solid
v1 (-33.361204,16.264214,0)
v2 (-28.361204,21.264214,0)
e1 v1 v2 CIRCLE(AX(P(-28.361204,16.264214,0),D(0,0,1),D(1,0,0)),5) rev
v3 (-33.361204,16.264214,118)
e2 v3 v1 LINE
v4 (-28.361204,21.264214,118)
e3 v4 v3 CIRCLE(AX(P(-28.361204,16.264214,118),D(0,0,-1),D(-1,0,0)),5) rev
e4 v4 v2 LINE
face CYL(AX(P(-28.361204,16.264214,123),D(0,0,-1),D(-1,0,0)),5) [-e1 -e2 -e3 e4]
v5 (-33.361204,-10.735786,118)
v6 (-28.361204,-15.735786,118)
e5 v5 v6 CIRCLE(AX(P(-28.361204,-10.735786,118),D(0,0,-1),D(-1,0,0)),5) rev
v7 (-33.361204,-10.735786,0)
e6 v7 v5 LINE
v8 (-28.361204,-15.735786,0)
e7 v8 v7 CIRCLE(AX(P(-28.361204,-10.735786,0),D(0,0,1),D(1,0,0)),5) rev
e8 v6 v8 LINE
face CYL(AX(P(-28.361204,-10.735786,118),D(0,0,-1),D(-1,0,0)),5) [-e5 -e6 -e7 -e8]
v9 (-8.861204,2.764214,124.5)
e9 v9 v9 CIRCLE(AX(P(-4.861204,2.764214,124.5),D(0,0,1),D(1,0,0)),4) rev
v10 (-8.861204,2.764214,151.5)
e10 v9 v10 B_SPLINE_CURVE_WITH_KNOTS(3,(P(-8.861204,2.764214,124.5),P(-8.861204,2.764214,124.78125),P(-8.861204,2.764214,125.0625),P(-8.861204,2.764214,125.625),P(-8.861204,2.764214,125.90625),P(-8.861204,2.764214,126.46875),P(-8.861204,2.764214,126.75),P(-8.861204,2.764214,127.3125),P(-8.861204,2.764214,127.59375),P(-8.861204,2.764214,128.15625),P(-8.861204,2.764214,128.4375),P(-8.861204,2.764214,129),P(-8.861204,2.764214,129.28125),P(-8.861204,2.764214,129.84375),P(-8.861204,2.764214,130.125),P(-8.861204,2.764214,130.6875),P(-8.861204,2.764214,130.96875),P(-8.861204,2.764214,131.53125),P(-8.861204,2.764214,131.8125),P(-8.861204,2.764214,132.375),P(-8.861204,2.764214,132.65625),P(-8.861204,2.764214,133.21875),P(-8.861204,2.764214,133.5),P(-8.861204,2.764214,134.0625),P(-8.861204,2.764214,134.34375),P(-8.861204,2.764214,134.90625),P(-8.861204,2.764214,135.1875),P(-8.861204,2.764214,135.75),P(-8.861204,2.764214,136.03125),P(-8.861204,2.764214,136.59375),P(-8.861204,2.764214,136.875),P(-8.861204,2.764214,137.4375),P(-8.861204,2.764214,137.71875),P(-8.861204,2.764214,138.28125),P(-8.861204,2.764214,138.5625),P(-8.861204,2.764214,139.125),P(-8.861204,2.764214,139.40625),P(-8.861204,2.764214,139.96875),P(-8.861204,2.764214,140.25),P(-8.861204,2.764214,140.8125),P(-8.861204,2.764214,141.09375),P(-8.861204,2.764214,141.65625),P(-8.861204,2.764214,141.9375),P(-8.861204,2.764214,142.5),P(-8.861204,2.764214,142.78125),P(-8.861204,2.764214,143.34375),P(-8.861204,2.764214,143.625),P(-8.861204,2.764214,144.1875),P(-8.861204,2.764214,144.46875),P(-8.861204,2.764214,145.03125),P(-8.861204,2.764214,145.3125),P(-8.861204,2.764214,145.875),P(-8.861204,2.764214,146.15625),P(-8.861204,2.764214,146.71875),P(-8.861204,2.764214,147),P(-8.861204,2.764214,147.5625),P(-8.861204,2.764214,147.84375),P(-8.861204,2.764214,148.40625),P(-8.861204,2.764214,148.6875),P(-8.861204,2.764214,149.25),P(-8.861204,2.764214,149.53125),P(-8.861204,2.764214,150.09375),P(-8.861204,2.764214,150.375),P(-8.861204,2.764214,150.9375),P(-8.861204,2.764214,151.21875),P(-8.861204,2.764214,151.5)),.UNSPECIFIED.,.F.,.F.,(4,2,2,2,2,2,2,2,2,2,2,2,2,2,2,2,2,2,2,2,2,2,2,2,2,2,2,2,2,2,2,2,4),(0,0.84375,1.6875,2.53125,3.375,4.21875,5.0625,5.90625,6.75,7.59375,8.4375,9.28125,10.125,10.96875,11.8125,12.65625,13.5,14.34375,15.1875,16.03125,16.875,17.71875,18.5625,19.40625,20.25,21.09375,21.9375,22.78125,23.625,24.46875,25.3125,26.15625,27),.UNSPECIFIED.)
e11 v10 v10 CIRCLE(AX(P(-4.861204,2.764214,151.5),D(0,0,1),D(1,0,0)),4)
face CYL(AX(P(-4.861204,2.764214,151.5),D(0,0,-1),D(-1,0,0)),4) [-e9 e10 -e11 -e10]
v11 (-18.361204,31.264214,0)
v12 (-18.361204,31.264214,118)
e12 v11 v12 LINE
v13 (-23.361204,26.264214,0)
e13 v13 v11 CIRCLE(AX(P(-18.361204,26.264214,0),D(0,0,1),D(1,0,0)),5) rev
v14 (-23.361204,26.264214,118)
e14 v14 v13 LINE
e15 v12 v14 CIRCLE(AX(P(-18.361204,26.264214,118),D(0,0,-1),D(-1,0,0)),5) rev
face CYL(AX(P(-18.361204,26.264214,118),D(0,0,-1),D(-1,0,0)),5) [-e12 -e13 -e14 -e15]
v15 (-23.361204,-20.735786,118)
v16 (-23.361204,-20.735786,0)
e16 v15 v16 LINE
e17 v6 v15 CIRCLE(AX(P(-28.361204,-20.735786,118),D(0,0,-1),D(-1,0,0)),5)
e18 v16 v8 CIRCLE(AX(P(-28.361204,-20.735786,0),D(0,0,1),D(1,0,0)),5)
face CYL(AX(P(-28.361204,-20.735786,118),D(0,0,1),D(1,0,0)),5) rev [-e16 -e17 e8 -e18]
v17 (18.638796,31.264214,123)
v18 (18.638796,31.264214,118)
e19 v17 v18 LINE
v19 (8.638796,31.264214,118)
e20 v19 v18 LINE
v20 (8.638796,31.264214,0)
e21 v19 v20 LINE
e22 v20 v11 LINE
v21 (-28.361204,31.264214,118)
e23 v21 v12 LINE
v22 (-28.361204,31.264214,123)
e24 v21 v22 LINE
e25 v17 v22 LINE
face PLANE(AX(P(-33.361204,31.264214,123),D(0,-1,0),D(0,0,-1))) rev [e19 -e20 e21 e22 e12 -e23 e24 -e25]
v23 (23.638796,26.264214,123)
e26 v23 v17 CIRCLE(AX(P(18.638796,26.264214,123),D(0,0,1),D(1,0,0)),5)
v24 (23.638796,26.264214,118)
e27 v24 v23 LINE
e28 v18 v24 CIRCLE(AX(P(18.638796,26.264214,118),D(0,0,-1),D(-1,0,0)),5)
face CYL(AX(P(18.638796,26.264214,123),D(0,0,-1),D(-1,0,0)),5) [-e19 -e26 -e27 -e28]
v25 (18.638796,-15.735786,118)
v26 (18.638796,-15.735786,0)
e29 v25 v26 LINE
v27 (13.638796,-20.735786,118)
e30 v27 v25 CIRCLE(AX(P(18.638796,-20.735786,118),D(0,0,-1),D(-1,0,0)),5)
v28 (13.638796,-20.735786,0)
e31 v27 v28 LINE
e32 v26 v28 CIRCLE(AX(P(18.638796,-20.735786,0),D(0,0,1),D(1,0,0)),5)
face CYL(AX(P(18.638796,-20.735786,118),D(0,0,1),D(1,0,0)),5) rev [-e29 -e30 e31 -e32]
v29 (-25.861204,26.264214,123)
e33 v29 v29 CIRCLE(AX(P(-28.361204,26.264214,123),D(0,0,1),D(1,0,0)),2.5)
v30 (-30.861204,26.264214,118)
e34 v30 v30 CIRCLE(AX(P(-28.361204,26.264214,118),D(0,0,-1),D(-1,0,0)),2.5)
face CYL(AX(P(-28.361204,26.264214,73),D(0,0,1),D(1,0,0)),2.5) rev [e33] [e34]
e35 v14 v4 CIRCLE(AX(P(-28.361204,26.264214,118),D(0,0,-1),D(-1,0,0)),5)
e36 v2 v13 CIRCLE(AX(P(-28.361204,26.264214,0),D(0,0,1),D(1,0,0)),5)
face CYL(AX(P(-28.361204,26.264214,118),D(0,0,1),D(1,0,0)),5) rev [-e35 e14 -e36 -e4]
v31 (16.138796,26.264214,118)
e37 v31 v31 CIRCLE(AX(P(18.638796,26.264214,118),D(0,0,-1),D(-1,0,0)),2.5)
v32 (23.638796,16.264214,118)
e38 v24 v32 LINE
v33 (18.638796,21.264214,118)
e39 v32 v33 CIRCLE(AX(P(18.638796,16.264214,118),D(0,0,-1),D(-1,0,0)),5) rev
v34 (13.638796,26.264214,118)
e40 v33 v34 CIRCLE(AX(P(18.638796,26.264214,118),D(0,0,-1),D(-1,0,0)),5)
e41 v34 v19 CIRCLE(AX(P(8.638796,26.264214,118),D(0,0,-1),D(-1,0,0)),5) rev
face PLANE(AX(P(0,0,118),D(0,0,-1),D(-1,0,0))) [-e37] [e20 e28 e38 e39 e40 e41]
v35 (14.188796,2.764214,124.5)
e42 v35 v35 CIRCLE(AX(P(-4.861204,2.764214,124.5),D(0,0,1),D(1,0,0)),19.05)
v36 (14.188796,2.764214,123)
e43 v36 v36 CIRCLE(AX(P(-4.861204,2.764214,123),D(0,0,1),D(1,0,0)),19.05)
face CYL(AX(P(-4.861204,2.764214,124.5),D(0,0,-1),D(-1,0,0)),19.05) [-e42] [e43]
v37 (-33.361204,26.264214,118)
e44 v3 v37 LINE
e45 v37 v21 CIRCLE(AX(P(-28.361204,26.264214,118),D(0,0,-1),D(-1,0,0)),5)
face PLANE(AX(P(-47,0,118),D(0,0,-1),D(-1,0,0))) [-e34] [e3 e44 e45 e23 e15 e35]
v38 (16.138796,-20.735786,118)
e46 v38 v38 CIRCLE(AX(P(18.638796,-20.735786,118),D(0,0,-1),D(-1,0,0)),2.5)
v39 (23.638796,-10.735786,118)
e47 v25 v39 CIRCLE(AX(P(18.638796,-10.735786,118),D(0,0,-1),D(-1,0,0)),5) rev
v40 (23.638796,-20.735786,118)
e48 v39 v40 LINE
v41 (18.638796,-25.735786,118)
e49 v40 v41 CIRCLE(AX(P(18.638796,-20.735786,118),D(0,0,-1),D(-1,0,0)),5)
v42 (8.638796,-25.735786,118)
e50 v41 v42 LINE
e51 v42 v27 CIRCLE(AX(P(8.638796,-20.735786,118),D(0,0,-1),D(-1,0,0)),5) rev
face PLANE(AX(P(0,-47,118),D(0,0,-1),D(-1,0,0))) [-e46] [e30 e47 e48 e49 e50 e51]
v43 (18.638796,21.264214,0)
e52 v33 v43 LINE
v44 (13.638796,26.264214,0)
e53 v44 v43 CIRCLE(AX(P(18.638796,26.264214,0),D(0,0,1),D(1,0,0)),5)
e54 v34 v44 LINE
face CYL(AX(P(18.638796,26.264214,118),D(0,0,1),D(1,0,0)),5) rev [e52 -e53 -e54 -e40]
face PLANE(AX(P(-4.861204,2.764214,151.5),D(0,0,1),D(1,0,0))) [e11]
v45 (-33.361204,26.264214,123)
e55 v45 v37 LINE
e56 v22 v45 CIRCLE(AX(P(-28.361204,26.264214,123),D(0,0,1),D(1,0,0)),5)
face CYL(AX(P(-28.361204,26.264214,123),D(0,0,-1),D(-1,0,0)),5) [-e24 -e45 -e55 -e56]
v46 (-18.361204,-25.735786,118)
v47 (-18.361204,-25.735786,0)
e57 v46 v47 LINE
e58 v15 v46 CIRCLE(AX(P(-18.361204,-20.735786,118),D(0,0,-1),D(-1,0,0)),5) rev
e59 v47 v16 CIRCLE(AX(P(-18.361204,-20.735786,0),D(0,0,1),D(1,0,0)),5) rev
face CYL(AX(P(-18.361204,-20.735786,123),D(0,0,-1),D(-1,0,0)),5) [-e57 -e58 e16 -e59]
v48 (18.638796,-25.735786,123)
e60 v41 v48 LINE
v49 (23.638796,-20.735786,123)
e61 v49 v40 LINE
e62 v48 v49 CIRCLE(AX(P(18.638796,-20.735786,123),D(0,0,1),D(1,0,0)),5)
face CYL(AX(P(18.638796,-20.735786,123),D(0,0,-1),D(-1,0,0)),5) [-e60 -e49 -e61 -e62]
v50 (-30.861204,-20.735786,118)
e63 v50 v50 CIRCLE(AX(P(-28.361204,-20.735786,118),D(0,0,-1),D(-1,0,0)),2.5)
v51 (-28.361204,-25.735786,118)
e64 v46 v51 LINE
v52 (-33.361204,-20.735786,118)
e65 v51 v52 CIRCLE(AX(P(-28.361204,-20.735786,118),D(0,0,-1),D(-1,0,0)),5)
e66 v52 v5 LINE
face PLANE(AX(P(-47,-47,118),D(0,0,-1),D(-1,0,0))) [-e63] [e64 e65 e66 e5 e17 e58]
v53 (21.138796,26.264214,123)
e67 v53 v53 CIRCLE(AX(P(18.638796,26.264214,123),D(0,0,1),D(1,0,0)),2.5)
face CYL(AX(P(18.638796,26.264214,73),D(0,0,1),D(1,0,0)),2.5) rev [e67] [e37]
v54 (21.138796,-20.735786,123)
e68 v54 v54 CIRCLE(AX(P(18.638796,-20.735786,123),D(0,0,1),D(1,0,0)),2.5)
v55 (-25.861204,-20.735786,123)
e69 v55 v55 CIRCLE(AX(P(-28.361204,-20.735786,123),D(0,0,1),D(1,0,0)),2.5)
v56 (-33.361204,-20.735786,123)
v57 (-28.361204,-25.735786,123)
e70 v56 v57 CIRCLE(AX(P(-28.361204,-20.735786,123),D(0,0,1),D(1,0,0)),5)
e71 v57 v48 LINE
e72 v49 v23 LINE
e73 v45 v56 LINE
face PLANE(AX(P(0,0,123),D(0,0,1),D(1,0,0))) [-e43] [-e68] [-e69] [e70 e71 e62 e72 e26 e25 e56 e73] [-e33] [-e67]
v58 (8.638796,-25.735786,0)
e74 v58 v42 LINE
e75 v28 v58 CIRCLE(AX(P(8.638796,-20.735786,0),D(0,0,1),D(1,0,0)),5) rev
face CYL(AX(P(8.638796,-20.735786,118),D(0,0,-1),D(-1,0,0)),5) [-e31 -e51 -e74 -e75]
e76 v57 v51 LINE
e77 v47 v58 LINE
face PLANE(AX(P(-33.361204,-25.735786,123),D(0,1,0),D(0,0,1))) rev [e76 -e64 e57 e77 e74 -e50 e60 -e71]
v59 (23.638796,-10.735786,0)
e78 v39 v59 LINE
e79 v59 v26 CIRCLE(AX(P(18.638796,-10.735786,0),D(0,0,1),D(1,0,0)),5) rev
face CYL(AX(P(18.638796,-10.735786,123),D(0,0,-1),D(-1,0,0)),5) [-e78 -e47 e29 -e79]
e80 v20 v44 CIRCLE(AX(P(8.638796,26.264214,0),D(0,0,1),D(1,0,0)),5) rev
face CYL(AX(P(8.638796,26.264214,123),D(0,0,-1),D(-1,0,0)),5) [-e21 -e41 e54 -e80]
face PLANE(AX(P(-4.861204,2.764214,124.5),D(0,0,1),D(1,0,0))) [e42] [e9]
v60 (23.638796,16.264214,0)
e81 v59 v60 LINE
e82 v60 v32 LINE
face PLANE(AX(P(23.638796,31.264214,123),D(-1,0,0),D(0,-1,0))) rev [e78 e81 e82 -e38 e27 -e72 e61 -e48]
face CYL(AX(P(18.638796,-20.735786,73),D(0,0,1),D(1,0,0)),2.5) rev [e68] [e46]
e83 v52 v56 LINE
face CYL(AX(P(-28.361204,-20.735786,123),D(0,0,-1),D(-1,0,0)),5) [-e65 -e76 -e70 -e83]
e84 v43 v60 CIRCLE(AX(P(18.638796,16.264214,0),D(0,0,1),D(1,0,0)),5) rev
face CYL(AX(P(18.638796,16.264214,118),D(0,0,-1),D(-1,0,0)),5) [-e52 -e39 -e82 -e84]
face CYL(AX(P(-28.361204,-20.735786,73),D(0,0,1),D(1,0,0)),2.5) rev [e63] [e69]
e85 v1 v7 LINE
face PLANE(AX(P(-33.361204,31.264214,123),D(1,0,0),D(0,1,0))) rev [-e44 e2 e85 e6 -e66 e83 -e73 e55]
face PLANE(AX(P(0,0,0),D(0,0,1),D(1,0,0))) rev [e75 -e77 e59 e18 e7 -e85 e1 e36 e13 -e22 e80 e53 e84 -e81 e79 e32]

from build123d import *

# Parameters (mm, degrees)
SKETCH1_W            = 57
SKETCH1_H            = 57
BOSS_EXTRUDE1_DEPTH  = 123
SKETCH2_W            = 10
SKETCH2_H            = 10
CUT_EXTRUDE1_DEPTH   = 118
LPATTERN1_COUNT      = 2
LPATTERN1_PITCH      = 47
LPATTERN1_COUNT_DIR2 = 2
LPATTERN1_PITCH_DIR2 = 47
SKETCH3_R            = 2.5
CUT_EXTRUDE2_DEPTH   = 50
LPATTERN2_COUNT      = 2
LPATTERN2_PITCH      = 47
LPATTERN2_COUNT_DIR2 = 2
LPATTERN2_PITCH_DIR2 = 47
FILLET1_R            = 5
SKETCH5_R            = 19.05
BOSS_EXTRUDE3_DEPTH  = 1.5
SKETCH4_R            = 4
BOSS_EXTRUDE2_DEPTH  = 28.5


with BuildPart() as part:
    # Sketch1 → Boss-Extrude1 (new body)
    with BuildSketch(Plane.XY):
        with Locations((-4.861204013, 2.764214047)):
            Rectangle(SKETCH1_W, SKETCH1_H)
    extrude(amount=BOSS_EXTRUDE1_DEPTH)

    # Sketch2 → Cut-Extrude1 (cut)
    with BuildSketch(Plane(origin=(0, 0, 0), x_dir=(-1, 0, 0), z_dir=(0, 0, -1))):
        with Locations((-18.638795987, 26.264214047)):
            Rectangle(SKETCH2_W, SKETCH2_H)
    cut_extrude1 = extrude(amount=-CUT_EXTRUDE1_DEPTH, mode=Mode.SUBTRACT)

    # LPattern1: Cut-Extrude1 2 × 2
    with Locations(*[(-i * LPATTERN1_PITCH, -j * LPATTERN1_PITCH_DIR2, 0) for i in range(LPATTERN1_COUNT) for j in range(LPATTERN1_COUNT_DIR2) if (i, j) != (0, 0)]):
        add(cut_extrude1, mode=Mode.SUBTRACT)

    # Sketch3 → Cut-Extrude2 (cut)
    with BuildSketch(Plane.XY.offset(123)):
        with Locations((-28.361204013, 26.264214047)):
            Circle(SKETCH3_R)
    cut_extrude2 = extrude(amount=-CUT_EXTRUDE2_DEPTH, mode=Mode.SUBTRACT)

    # LPattern2: Cut-Extrude2 2 × 2
    with Locations(*[(i * LPATTERN2_PITCH, -j * LPATTERN2_PITCH_DIR2, 0) for i in range(LPATTERN2_COUNT) for j in range(LPATTERN2_COUNT_DIR2) if (i, j) != (0, 0)]):
        add(cut_extrude2, mode=Mode.SUBTRACT)

    # Fillet1
    fillet1_edges = [part.edges().sort_by_distance(p)[0] for p in [
        (-33.361204013, 21.264214047, 59),
        (-23.361204013, 21.264214047, 59),
        (-23.361204013, 31.264214047, 59),
        (13.638795987, 31.264214047, 59),
        (13.638795987, 21.264214047, 59),
        (23.638795987, 21.264214047, 59),
        (23.638795987, -25.735785953, 120.5),
        (23.638795987, -15.735785953, 59),
        (13.638795987, -15.735785953, 59),
        (13.638795987, -25.735785953, 59),
        (-23.361204013, -25.735785953, 59),
        (-23.361204013, -15.735785953, 59),
        (-33.361204013, -15.735785953, 59),
        (-33.361204013, -25.735785953, 120.5),
        (-33.361204013, 31.264214047, 120.5),
        (23.638795987, 31.264214047, 120.5),
    ]]
    fillet(fillet1_edges, radius=FILLET1_R - 0.0001)  # a hair under: the kernel refuses the full size

    # Sketch5 → Boss-Extrude3 (add)
    with BuildSketch(Plane.XY.offset(123)):
        with Locations((-4.861204013, 2.764214047)):
            Circle(SKETCH5_R)
    extrude(amount=BOSS_EXTRUDE3_DEPTH)

    # Sketch4 → Boss-Extrude2 (add)
    with BuildSketch(Plane.XY.offset(123)):
        with Locations(Location((-4.861204013, 2.764214047, 0), (0, 0, 180))):
            Circle(SKETCH4_R)
    extrude(amount=BOSS_EXTRUDE2_DEPTH)


solid = part.part
